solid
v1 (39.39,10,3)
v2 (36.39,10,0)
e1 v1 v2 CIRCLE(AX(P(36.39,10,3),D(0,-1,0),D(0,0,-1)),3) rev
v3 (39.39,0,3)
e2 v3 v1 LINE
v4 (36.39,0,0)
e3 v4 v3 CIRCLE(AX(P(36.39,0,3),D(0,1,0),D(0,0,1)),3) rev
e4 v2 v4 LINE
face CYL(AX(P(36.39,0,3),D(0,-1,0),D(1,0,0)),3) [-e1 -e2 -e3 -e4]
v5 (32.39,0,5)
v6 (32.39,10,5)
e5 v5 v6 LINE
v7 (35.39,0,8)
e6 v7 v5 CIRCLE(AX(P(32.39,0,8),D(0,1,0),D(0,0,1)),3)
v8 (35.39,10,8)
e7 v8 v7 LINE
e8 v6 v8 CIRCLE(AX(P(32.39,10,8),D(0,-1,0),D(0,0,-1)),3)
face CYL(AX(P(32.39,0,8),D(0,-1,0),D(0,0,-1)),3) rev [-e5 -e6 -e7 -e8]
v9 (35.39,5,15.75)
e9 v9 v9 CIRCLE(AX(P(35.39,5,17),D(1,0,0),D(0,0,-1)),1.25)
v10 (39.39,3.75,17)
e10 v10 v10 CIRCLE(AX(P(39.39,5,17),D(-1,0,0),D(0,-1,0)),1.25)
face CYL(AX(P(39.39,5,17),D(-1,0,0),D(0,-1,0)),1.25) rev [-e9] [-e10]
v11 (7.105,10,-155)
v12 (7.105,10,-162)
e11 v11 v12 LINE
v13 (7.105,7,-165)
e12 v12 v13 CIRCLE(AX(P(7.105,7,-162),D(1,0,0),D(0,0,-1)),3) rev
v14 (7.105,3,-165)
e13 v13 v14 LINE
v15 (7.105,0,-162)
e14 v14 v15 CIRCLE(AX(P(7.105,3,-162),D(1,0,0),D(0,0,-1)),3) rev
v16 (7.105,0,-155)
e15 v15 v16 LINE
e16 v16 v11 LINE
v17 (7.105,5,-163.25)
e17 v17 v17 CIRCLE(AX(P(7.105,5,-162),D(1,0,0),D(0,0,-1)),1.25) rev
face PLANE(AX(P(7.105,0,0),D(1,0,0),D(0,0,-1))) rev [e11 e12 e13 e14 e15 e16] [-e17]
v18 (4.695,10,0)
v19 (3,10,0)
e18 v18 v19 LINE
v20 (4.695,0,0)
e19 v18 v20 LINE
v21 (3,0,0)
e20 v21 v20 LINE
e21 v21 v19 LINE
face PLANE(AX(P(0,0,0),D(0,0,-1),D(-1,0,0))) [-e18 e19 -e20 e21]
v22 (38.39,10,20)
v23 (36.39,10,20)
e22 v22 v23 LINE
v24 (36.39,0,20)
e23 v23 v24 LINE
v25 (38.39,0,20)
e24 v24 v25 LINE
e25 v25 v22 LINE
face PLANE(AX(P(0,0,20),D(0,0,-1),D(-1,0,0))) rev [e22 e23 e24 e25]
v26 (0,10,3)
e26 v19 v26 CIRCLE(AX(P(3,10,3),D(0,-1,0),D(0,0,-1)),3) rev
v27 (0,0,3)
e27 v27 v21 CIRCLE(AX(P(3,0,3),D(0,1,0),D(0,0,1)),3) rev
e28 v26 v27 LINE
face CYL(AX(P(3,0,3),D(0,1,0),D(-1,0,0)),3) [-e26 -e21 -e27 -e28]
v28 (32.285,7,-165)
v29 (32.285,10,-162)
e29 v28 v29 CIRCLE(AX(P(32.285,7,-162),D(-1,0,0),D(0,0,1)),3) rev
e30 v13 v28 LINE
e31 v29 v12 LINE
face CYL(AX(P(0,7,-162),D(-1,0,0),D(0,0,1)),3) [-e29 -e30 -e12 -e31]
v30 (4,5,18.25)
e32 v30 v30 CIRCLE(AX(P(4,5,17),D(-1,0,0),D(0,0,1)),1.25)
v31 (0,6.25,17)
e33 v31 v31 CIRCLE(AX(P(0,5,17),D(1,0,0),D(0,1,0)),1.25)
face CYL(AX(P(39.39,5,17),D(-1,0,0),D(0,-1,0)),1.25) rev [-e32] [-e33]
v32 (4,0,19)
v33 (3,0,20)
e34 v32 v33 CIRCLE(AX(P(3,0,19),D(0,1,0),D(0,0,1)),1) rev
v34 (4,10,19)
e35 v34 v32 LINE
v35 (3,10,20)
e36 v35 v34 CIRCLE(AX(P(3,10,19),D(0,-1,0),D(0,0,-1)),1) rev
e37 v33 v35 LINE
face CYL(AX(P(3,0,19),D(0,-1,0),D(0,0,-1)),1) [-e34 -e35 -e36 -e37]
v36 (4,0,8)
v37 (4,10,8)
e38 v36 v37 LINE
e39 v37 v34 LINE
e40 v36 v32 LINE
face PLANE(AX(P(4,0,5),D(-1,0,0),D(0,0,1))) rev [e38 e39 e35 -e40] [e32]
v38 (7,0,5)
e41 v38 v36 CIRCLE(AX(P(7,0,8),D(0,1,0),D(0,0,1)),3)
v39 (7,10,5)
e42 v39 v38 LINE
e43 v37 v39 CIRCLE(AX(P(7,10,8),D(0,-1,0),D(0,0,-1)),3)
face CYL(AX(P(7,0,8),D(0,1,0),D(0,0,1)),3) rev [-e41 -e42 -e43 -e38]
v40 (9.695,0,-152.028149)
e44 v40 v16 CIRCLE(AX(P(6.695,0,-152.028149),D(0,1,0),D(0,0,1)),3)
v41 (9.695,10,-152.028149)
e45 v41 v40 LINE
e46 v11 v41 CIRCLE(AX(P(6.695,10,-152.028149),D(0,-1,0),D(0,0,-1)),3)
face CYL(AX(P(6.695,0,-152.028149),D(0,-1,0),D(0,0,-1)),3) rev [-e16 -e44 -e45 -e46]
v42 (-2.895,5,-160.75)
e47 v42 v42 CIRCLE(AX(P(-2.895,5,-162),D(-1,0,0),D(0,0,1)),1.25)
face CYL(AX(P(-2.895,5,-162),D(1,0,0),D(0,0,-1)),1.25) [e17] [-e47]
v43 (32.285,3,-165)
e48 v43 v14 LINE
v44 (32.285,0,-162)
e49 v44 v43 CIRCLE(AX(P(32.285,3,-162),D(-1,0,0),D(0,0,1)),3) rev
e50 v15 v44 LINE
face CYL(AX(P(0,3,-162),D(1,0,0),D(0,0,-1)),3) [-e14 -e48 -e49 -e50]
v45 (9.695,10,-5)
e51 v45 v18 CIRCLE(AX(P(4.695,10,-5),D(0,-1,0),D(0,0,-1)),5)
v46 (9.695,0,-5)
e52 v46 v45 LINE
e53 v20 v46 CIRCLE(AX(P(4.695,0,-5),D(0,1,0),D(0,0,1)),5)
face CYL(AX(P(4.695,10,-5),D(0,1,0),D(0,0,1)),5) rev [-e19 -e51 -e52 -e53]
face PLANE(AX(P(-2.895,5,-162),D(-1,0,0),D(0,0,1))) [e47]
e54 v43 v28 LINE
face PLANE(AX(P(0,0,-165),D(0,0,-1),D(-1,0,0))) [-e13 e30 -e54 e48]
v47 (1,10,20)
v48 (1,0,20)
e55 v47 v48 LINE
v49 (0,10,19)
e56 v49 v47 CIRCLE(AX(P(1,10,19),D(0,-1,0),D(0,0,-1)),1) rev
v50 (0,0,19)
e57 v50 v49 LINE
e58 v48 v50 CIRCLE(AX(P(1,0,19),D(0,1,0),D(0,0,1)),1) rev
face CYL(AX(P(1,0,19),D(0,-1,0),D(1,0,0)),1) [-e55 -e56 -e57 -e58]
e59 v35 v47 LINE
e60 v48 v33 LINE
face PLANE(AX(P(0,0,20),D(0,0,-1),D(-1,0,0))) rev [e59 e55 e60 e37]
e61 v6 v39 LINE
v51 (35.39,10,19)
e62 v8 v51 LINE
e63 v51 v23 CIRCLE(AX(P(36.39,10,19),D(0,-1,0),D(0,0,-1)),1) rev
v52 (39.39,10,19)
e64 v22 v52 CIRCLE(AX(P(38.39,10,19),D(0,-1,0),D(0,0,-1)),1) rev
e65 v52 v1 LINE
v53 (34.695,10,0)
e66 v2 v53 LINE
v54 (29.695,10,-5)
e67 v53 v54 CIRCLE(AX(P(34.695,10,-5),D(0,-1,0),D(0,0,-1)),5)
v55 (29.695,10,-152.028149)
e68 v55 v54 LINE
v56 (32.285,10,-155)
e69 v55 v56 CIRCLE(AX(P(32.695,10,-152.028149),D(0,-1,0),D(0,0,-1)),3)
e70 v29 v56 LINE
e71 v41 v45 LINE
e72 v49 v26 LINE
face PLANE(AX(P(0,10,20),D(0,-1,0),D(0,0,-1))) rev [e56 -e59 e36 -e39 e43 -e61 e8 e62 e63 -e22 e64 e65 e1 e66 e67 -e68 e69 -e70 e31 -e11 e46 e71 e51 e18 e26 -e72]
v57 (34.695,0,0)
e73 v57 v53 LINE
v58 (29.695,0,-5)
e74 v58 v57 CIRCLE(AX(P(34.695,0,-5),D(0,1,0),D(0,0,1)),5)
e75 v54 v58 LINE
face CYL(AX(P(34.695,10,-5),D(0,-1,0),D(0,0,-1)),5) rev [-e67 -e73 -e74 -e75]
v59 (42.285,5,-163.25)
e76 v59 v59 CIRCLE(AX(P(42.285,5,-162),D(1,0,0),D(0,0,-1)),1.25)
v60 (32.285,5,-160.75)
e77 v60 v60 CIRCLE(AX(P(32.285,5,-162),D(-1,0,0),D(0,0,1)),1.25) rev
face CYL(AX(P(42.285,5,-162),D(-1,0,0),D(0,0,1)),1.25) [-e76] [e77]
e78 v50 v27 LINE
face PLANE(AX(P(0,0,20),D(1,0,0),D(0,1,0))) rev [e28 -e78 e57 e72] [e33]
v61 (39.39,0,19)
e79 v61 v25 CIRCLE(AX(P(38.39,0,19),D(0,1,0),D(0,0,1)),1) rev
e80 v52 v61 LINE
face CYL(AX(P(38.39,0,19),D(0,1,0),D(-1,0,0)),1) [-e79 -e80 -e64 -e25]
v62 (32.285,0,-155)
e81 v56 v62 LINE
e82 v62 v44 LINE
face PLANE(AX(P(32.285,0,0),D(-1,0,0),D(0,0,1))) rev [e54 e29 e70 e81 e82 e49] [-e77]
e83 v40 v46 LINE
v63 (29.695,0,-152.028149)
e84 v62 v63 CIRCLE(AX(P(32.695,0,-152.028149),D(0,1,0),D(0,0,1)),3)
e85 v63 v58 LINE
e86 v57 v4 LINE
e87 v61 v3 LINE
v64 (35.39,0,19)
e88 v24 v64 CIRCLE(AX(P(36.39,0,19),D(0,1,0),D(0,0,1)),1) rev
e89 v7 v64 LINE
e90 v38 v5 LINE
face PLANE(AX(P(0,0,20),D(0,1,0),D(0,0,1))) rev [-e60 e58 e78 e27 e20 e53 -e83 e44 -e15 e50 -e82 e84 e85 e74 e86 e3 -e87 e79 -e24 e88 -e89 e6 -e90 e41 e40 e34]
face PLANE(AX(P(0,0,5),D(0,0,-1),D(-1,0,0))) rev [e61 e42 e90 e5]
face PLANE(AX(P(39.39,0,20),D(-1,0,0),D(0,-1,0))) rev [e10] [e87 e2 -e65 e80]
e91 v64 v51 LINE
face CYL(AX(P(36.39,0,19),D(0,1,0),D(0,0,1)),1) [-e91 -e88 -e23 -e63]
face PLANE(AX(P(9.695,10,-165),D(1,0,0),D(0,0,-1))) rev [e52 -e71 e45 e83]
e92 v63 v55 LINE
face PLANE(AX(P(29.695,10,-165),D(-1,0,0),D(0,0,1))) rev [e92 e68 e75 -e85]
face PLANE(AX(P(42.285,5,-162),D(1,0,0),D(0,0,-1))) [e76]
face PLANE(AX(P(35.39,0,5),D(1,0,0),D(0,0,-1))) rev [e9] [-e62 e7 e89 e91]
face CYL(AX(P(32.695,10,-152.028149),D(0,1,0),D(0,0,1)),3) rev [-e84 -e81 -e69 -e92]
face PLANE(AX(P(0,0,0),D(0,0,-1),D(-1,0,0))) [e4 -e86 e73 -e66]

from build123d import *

# Parameters (mm, degrees)
SKETCH1_W               = 39.39
SKETCH1_H               = 10
BOSS_EXTRUDE1_DEPTH     = 20
SKETCH2_W               = 31.39
SKETCH2_H               = 10
CUT_EXTRUDE1_DEPTH      = 15
CUT_EXTRUDE2_DEPTH      = 46.294283304
CUT_EXTRUDE2_DEPTH_BACK = 46.294283304
SKETCH3_R               = 1.25
FILLET1_R               = 3
FILLET3_R               = 1
SKETCH4_W               = 20
SKETCH4_H               = 10
BOSS_EXTRUDE2_DEPTH     = 165
FILLET4_R               = 5
SKETCH7_W               = 10
SKETCH7_H               = 10
BOSS_EXTRUDE5_DEPTH     = 2.59
SKETCH8_W               = 10
SKETCH8_H               = 10
BOSS_EXTRUDE6_DEPTH     = 2.59
FILLET7_R               = 3
FILLET11_R              = 3
SKETCH9_R               = 1.25
BOSS_EXTRUDE7_DEPTH     = 10
BOSS_EXTRUDE8_START     = 10
SKETCH10_R              = 1.25
BOSS_EXTRUDE8_DEPTH     = 10


with BuildPart() as part:
    # Sketch1 → Boss-Extrude1 (new body)
    with BuildSketch(Plane.XY):
        with Locations((19.695, 5)):
            Rectangle(SKETCH1_W, SKETCH1_H)
    extrude(amount=BOSS_EXTRUDE1_DEPTH)

    # Sketch2 → Cut-Extrude1 (cut)
    with BuildSketch(Plane.XY.offset(20)):
        with Locations((19.695, 5)):
            Rectangle(SKETCH2_W, SKETCH2_H)
    extrude(amount=-CUT_EXTRUDE1_DEPTH, mode=Mode.SUBTRACT)

    # Sketch3 → Cut-Extrude2 (cut, two sides: drawn at the far end of the back side and taken through both)
    with BuildSketch(Plane.ZY.offset(-CUT_EXTRUDE2_DEPTH_BACK)):
        with Locations(Location((17, 5, 0), (0, 0, 270))):
            Circle(SKETCH3_R)
    extrude(amount=CUT_EXTRUDE2_DEPTH + CUT_EXTRUDE2_DEPTH_BACK, mode=Mode.SUBTRACT)

    # Fillet1
    fillet1_edges = [part.edges().sort_by_distance(p)[0] for p in [
        (4, 5, 5),
        (35.39, 5, 5),
        (39.39, 5, 0),
        (0, 5, 0),
    ]]
    fillet(fillet1_edges, radius=FILLET1_R)

    # Fillet3
    fillet3_edges = [part.edges().sort_by_distance(p)[0] for p in [
        (39.39, 5, 20),
        (4, 5, 20),
        (35.39, 5, 20),
        (0, 5, 20),
    ]]
    fillet(fillet3_edges, radius=FILLET3_R)

    # Sketch4 → Boss-Extrude2 (add)
    with BuildSketch(Plane(origin=(0, 0, 0), x_dir=(-1, 0, 0), z_dir=(0, 0, -1))):
        with Locations((-19.695, 5)):
            Rectangle(SKETCH4_W, SKETCH4_H)
    extrude(amount=BOSS_EXTRUDE2_DEPTH)

    # Fillet4
    fillet4_edges = [part.edges().sort_by_distance(p)[0] for p in [
        (29.695, 5, 0),
        (9.695, 5, 0),
    ]]
    fillet(fillet4_edges, radius=FILLET4_R)

    # Sketch7 → Boss-Extrude5 (add)
    with BuildSketch(Plane.ZY.offset(-9.695)):
        with Locations((-160, 5)):
            Rectangle(SKETCH7_W, SKETCH7_H)
    extrude(amount=BOSS_EXTRUDE5_DEPTH)

    # Sketch8 → Boss-Extrude6 (add)
    with BuildSketch(Plane(origin=(29.695, 0, 0), x_dir=(0, 0, -1), z_dir=(1, 0, 0))):
        with Locations((160, 5)):
            Rectangle(SKETCH8_W, SKETCH8_H)
    extrude(amount=BOSS_EXTRUDE6_DEPTH)

    # Fillet7
    # the kernel refuses this fillet: 3 mm, written as the material it adds along each edge
    with BuildSketch(Plane(origin=(9.695, 0, -155), x_dir=(0, 0, 1), z_dir=(0, 1, 0))) as fillet7_piece_1:
        with BuildLine():
            CenterArc((2.971851275, -3), FILLET7_R, 90, 82.144993797)
            Line((0, -2.59), (-0.059437025, -2.5818))
            ThreePointArc((-0.059437025, -2.5818), (-0.06, -1.295), (-0.06, 0))
            Line((-0.06, 0), (0, 0.06))
            Line((0, 0.06), (2.971851275, 0.06))
            Line((2.971851275, 0.06), (2.971851275, 0))
        make_face()
    extrude(amount=10)
    with BuildSketch(Plane(origin=(29.695, 10, -155), x_dir=(1, 0, 0), z_dir=(0, -1, 0))) as fillet7_piece_2:
        with BuildLine():
            CenterArc((3, 2.971851275), FILLET7_R, 180, 82.144993797)
            Line((0, 2.971851275), (-0.06, 2.971851275))
            Line((-0.06, 2.971851275), (-0.06, 0))
            Line((-0.06, 0), (0, -0.06))
            ThreePointArc((0, -0.06), (1.295, -0.06), (2.5818, -0.059437025))
            Line((2.5818, -0.059437025), (2.59, 0))
        make_face()
    extrude(amount=10)

    # Fillet11
    fillet11_edges = [part.edges().sort_by_distance(p)[0] for p in [
        (19.695, 0, -165),
        (19.695, 10, -165),
    ]]
    fillet(fillet11_edges, radius=FILLET11_R)

    # Sketch9 → Boss-Extrude7 (add)
    with BuildSketch(Plane.ZY.offset(-7.105)):
        with Locations(Location((-162, 5, 0), (0, 0, 180))):
            Circle(SKETCH9_R)
    extrude(amount=BOSS_EXTRUDE7_DEPTH)

    # Sketch10 → Boss-Extrude8 (add)
    with BuildSketch(Plane(origin=(32.285, 0, 0), x_dir=(0, 0, -1), z_dir=(1, 0, 0)).offset(BOSS_EXTRUDE8_START)):
        with Locations((162, 5)):
            Circle(SKETCH10_R)
    extrude(amount=-BOSS_EXTRUDE8_DEPTH)


solid = part.part
